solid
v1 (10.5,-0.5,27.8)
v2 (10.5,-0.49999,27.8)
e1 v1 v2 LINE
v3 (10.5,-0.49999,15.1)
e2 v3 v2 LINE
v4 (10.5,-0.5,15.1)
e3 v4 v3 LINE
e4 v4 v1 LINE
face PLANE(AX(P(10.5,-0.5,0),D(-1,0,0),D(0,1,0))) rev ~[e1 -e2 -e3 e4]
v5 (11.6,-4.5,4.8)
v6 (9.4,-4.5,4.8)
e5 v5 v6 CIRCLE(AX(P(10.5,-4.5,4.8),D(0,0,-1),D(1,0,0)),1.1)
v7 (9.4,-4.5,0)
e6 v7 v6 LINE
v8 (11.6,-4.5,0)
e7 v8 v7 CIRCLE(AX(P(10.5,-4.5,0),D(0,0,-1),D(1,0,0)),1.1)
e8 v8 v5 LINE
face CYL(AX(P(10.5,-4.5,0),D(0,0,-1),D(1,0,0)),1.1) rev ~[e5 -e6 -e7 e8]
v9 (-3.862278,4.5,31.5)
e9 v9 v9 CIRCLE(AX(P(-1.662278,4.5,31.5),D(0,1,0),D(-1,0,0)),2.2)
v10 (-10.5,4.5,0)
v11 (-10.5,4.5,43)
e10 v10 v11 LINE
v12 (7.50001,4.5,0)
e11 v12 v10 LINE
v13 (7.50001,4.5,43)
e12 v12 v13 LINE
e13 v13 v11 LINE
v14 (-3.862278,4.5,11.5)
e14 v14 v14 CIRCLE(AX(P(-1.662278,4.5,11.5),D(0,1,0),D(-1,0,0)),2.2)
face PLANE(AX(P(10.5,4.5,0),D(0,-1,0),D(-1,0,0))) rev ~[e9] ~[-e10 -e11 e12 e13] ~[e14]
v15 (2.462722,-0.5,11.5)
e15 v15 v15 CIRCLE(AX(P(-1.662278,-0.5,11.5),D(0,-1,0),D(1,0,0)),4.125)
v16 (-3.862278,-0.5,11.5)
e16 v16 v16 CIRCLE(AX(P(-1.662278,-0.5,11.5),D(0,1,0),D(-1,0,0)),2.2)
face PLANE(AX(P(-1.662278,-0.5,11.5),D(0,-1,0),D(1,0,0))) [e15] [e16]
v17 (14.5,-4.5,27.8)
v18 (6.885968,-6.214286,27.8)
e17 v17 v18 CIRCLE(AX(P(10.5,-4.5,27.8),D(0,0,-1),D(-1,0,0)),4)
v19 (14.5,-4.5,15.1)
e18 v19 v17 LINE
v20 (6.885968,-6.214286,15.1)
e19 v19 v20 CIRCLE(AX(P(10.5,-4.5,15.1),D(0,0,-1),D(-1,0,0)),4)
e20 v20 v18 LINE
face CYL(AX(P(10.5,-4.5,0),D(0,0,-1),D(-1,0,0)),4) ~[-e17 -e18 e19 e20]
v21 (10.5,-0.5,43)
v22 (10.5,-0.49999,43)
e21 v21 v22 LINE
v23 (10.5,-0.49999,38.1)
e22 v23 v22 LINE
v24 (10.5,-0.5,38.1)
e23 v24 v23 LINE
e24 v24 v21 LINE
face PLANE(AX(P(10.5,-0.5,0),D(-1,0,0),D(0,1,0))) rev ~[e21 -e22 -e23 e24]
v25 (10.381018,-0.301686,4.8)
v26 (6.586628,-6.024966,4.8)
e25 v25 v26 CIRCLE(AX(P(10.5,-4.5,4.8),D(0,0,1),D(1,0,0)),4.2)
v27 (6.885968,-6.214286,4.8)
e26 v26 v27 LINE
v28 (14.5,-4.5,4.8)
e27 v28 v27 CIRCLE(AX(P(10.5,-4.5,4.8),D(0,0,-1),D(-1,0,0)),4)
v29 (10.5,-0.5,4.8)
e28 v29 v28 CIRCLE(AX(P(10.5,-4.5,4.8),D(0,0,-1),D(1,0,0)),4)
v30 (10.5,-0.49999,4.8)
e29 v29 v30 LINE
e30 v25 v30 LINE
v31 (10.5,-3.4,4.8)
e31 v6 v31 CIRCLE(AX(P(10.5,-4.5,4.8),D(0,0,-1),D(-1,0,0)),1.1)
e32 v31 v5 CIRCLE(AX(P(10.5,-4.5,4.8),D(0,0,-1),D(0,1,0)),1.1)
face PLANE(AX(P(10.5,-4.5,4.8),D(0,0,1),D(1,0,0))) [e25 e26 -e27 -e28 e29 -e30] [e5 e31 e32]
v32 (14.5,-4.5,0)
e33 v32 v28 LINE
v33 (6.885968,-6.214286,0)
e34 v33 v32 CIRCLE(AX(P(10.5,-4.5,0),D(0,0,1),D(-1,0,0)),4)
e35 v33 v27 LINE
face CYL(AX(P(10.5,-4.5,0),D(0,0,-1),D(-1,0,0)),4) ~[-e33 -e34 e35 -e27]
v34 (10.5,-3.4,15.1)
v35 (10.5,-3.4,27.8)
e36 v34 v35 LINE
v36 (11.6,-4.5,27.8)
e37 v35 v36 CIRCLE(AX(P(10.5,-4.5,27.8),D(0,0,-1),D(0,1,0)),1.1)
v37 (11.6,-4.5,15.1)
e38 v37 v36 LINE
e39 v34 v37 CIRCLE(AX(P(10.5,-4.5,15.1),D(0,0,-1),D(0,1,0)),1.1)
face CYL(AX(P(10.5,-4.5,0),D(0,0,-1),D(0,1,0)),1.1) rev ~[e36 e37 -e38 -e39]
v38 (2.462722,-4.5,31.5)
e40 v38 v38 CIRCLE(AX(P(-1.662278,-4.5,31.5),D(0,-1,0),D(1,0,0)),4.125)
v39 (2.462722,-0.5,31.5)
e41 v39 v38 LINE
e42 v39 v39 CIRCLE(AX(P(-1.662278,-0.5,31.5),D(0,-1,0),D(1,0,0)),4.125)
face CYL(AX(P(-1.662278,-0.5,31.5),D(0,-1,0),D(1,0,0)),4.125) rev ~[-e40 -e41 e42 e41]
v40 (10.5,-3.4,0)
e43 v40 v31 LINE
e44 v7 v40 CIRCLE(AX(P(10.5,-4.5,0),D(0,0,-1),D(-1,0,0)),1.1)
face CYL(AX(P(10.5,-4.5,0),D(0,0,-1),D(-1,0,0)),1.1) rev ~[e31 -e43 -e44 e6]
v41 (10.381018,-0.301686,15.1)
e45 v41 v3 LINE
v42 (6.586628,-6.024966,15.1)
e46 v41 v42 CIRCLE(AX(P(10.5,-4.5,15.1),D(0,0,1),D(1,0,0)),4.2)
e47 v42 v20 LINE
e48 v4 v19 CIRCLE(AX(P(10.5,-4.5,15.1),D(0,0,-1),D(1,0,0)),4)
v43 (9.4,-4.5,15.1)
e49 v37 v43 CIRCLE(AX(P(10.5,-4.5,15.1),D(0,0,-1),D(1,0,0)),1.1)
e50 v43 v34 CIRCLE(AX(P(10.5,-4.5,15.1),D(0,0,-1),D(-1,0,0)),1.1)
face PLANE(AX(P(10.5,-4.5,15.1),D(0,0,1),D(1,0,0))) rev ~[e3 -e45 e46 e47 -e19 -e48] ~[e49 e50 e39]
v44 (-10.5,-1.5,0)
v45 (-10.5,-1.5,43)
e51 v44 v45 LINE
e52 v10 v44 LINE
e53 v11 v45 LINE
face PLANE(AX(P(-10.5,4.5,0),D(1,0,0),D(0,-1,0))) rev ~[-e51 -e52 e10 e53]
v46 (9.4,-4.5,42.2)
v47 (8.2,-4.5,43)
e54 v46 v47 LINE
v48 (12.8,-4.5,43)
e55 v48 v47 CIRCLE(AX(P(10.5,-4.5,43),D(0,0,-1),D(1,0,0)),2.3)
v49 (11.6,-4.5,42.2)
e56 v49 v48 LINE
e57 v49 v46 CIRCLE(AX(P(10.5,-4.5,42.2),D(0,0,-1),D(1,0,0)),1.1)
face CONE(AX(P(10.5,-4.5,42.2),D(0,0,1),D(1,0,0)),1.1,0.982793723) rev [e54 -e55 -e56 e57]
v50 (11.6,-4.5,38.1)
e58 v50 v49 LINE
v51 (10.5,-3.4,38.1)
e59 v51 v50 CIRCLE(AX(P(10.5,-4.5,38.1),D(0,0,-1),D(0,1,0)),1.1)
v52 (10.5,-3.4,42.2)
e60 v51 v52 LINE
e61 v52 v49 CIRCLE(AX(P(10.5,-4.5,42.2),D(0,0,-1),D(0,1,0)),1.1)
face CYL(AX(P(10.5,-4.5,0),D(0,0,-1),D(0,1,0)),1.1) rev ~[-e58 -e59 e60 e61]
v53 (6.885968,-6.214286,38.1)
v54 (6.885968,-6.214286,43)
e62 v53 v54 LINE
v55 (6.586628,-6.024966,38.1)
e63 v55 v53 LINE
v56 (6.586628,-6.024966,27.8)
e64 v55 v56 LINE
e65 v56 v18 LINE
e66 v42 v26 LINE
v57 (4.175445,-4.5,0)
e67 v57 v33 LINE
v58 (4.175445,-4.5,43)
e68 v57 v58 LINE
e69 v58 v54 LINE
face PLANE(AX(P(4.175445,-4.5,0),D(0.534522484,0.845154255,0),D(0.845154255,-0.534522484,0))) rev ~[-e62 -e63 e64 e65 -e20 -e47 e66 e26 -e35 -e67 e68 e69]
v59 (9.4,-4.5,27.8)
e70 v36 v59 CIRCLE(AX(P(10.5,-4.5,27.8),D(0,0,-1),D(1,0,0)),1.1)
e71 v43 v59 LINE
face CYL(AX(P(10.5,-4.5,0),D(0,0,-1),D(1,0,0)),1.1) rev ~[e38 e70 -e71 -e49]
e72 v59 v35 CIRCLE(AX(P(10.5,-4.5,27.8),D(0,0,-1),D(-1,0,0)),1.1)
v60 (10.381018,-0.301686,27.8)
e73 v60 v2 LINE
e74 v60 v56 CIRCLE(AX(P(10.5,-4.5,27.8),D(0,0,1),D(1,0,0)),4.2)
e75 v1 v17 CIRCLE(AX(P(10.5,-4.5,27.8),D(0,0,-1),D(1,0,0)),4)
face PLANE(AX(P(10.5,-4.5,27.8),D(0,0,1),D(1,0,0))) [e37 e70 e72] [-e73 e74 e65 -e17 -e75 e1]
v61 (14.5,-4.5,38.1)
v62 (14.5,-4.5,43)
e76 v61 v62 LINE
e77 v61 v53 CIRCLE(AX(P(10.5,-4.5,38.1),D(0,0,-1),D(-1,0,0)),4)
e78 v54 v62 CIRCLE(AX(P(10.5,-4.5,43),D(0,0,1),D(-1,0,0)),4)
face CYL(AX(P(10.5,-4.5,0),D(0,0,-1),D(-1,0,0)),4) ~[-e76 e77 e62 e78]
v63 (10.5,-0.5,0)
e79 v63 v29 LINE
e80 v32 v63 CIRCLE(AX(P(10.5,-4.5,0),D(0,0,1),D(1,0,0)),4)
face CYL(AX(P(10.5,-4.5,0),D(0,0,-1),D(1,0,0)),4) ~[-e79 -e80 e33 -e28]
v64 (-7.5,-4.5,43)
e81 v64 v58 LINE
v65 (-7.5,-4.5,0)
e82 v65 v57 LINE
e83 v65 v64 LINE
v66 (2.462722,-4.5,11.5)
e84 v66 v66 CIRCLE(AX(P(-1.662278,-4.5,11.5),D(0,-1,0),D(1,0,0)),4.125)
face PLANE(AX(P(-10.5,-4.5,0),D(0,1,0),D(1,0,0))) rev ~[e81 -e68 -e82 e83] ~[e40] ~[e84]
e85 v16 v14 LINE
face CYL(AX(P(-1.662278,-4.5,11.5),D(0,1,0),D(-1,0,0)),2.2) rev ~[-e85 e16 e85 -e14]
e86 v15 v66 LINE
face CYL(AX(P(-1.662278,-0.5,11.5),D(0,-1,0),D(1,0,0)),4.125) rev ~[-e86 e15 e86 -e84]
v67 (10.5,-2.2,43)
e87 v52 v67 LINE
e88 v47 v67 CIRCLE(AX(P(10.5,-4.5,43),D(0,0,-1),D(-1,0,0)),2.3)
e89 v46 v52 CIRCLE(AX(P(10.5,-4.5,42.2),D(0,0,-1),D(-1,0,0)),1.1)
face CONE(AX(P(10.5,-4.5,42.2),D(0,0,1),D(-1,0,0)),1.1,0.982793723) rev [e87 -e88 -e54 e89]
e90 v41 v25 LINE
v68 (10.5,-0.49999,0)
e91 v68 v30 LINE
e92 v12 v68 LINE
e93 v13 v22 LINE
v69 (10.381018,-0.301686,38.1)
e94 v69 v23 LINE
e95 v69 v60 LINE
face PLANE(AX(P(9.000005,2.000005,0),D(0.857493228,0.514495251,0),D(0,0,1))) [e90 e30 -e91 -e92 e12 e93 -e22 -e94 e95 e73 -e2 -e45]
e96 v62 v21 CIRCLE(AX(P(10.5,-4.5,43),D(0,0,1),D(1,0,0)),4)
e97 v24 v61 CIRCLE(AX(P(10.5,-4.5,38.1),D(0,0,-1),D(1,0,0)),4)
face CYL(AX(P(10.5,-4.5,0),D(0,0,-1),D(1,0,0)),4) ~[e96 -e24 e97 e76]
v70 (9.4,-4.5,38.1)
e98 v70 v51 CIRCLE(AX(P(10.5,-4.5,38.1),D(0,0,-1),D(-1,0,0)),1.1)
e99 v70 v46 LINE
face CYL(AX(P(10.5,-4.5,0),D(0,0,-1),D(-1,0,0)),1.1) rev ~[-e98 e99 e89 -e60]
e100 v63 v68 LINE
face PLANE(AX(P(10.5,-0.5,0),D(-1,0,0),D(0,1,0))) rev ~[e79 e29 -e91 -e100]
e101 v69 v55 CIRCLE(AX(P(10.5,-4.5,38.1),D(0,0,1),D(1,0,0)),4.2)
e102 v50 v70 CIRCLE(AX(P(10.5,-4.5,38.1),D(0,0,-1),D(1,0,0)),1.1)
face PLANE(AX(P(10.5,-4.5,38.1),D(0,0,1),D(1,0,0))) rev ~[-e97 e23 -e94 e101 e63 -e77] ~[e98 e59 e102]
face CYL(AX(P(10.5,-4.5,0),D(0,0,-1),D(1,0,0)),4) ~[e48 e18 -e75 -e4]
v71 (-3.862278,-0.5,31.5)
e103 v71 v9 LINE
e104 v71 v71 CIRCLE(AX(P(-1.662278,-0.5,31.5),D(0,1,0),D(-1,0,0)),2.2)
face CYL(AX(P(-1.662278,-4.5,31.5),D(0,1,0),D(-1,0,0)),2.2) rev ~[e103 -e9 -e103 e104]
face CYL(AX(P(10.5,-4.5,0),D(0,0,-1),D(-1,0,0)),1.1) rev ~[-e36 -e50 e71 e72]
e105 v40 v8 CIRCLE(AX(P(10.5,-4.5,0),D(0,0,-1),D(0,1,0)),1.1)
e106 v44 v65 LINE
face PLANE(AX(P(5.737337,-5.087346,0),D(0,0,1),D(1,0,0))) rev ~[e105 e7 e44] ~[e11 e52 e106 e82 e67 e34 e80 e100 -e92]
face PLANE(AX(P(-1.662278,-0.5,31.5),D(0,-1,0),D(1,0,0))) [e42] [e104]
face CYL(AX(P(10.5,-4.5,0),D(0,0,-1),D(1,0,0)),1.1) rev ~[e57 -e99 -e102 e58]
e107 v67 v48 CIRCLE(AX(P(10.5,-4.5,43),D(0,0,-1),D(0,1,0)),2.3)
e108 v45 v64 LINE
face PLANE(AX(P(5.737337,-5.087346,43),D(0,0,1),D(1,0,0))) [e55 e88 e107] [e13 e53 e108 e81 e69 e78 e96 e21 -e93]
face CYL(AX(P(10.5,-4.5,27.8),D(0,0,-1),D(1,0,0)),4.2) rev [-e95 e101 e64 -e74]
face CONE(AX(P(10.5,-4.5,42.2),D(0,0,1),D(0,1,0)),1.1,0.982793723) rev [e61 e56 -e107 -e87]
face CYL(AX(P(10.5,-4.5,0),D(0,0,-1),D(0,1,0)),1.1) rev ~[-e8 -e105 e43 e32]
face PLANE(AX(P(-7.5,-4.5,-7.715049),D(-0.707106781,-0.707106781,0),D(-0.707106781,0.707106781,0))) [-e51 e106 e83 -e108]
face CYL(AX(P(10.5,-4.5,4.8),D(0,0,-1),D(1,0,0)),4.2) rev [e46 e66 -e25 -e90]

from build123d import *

# Parameters (mm, degrees)
F1_DEPTH       = 43
F2_T1_DEPTH    = 43
F2_T3_DEPTH    = 58.4300979278
F4_D           = 4.4
F4_CBORE_D     = 8.25
F4_CBORE_DEPTH = 4
F5_SIZE2       = 4.99999
F5_SIZE        = 2.99999
F7_START       = 4.8
F6_R           = 4.2
F7_DEPTH       = 10.3
F8_START       = 27.8
F8_DEPTH       = 10.3
F9_SIZE2       = 1.2
F9_SIZE        = 0.8


# Not quite as in the source:
# - a fillet or chamfer that OpenCascade refuses, or shapes differently, is made with other operations: its cross-section is extruded or revolved along the edge and cut away or added
# - a fillet or chamfer is up to 0.001 mm smaller than in the source, because OpenCascade refuses the exact size


with BuildPart() as f1:
    # F0 (on Top) → F1 (new body)
    with BuildSketch(Plane.XY):
        with BuildLine():
            Line((-10.5, -4.5), (6.5, -4.5))
            ThreePointArc((6.5, -4.5), (7.6715728753, -1.6715728753), (10.5, -0.5))
            Line((10.5, -0.5), (10.5, 4.5))
            Line((10.5, 4.5), (-10.5, 4.5))
            Line((-10.5, 4.5), (-10.5, -4.5))
        make_face()
        with BuildLine():
            Line((6.5, -4.5), (9.4, -4.5))
            ThreePointArc((9.4, -4.5), (9.7221825407, -3.7221825407), (10.5, -3.4))
            Line((10.5, -3.4), (10.5, -0.5))
            ThreePointArc((10.5, -0.5), (7.6715728753, -1.6715728753), (6.5, -4.5))
        make_face()
        with BuildLine():
            ThreePointArc((11.6, -4.5), (10.5, -5.6), (9.4, -4.5))
            Line((9.4, -4.5), (6.5, -4.5))
            ThreePointArc((6.5, -4.5), (10.5, -8.5), (14.5, -4.5))
            ThreePointArc((14.5, -4.5), (13.3284271247, -1.6715728753), (10.5, -0.5))
            Line((10.5, -0.5), (10.5, -3.4))
            ThreePointArc((10.5, -3.4), (11.2778174593, -3.7221825407), (11.6, -4.5))
        make_face()
    extrude(amount=F1_DEPTH)

    # F2: chamfer of 3 on 2 edges, made by hand

    # F2_s2 → F2_t1 (join)
    with BuildSketch(Plane.XY):
        with BuildLine():
            Line((4.1754446797, -4.5), (6.8859683884, -6.2142857143))
            ThreePointArc((6.8859683884, -6.2142857143), (6.6075772395, -5.4214364079), (6.5, -4.5))
            Line((6.5, -4.5), (4.1754446797, -4.5))
        make_face()
    extrude(amount=F2_T1_DEPTH)

    # F2_s4 → F2_t3 (cut)
    with BuildSketch(Plane.XY.offset(-7.7150489639)):
        Polygon((-7.5, -4.5), (-10.5, -1.5), (-10.5, -4.5), align=None)
    extrude(amount=F2_T3_DEPTH, mode=Mode.SUBTRACT)

    # F4 (through all)
    with Locations(Plane.XZ.offset(4.5)):
        with Locations((-1.6622776602, 31.5), (-1.6622776602, 11.5)):
            CounterBoreHole(F4_D / 2, F4_CBORE_D / 2, F4_CBORE_DEPTH)

    # F5 (size 3 and 5 in the source; OpenCascade refuses exactly that, so slightly less here)
    f5_edges = [f1.edges().sort_by_distance(p)[0] for p in [
        (10.5, 4.5, 21.5),
    ]]
    f5_side = f1.faces().sort_by_distance((0.057932, 4.5, 21.5))[0]
    chamfer(f5_edges, length=F5_SIZE, length2=F5_SIZE2, reference=f5_side)

    # F6 (on face) → F7 (cut)
    with BuildSketch(Plane.XY.offset(F7_START)):
        with Locations((10.5, -4.5)):
            Circle(F6_R)
    extrude(amount=F7_DEPTH, mode=Mode.SUBTRACT)

    # F6 (on face) → F8 (cut)
    with BuildSketch(Plane.XY.offset(F8_START)):
        with Locations((10.5, -4.5)):
            Circle(F6_R)
    extrude(amount=F8_DEPTH, mode=Mode.SUBTRACT)

    # F9
    f9_edges = [f1.edges().sort_by_distance(p)[0] for p in [
        (10.5, -5.6, 43),
    ]]
    f9_side = f1.faces().sort_by_distance((10.5, -5.6, 40.55))[0]
    chamfer(f9_edges, length=F9_SIZE, length2=F9_SIZE2, reference=f9_side)


solid = f1.part
